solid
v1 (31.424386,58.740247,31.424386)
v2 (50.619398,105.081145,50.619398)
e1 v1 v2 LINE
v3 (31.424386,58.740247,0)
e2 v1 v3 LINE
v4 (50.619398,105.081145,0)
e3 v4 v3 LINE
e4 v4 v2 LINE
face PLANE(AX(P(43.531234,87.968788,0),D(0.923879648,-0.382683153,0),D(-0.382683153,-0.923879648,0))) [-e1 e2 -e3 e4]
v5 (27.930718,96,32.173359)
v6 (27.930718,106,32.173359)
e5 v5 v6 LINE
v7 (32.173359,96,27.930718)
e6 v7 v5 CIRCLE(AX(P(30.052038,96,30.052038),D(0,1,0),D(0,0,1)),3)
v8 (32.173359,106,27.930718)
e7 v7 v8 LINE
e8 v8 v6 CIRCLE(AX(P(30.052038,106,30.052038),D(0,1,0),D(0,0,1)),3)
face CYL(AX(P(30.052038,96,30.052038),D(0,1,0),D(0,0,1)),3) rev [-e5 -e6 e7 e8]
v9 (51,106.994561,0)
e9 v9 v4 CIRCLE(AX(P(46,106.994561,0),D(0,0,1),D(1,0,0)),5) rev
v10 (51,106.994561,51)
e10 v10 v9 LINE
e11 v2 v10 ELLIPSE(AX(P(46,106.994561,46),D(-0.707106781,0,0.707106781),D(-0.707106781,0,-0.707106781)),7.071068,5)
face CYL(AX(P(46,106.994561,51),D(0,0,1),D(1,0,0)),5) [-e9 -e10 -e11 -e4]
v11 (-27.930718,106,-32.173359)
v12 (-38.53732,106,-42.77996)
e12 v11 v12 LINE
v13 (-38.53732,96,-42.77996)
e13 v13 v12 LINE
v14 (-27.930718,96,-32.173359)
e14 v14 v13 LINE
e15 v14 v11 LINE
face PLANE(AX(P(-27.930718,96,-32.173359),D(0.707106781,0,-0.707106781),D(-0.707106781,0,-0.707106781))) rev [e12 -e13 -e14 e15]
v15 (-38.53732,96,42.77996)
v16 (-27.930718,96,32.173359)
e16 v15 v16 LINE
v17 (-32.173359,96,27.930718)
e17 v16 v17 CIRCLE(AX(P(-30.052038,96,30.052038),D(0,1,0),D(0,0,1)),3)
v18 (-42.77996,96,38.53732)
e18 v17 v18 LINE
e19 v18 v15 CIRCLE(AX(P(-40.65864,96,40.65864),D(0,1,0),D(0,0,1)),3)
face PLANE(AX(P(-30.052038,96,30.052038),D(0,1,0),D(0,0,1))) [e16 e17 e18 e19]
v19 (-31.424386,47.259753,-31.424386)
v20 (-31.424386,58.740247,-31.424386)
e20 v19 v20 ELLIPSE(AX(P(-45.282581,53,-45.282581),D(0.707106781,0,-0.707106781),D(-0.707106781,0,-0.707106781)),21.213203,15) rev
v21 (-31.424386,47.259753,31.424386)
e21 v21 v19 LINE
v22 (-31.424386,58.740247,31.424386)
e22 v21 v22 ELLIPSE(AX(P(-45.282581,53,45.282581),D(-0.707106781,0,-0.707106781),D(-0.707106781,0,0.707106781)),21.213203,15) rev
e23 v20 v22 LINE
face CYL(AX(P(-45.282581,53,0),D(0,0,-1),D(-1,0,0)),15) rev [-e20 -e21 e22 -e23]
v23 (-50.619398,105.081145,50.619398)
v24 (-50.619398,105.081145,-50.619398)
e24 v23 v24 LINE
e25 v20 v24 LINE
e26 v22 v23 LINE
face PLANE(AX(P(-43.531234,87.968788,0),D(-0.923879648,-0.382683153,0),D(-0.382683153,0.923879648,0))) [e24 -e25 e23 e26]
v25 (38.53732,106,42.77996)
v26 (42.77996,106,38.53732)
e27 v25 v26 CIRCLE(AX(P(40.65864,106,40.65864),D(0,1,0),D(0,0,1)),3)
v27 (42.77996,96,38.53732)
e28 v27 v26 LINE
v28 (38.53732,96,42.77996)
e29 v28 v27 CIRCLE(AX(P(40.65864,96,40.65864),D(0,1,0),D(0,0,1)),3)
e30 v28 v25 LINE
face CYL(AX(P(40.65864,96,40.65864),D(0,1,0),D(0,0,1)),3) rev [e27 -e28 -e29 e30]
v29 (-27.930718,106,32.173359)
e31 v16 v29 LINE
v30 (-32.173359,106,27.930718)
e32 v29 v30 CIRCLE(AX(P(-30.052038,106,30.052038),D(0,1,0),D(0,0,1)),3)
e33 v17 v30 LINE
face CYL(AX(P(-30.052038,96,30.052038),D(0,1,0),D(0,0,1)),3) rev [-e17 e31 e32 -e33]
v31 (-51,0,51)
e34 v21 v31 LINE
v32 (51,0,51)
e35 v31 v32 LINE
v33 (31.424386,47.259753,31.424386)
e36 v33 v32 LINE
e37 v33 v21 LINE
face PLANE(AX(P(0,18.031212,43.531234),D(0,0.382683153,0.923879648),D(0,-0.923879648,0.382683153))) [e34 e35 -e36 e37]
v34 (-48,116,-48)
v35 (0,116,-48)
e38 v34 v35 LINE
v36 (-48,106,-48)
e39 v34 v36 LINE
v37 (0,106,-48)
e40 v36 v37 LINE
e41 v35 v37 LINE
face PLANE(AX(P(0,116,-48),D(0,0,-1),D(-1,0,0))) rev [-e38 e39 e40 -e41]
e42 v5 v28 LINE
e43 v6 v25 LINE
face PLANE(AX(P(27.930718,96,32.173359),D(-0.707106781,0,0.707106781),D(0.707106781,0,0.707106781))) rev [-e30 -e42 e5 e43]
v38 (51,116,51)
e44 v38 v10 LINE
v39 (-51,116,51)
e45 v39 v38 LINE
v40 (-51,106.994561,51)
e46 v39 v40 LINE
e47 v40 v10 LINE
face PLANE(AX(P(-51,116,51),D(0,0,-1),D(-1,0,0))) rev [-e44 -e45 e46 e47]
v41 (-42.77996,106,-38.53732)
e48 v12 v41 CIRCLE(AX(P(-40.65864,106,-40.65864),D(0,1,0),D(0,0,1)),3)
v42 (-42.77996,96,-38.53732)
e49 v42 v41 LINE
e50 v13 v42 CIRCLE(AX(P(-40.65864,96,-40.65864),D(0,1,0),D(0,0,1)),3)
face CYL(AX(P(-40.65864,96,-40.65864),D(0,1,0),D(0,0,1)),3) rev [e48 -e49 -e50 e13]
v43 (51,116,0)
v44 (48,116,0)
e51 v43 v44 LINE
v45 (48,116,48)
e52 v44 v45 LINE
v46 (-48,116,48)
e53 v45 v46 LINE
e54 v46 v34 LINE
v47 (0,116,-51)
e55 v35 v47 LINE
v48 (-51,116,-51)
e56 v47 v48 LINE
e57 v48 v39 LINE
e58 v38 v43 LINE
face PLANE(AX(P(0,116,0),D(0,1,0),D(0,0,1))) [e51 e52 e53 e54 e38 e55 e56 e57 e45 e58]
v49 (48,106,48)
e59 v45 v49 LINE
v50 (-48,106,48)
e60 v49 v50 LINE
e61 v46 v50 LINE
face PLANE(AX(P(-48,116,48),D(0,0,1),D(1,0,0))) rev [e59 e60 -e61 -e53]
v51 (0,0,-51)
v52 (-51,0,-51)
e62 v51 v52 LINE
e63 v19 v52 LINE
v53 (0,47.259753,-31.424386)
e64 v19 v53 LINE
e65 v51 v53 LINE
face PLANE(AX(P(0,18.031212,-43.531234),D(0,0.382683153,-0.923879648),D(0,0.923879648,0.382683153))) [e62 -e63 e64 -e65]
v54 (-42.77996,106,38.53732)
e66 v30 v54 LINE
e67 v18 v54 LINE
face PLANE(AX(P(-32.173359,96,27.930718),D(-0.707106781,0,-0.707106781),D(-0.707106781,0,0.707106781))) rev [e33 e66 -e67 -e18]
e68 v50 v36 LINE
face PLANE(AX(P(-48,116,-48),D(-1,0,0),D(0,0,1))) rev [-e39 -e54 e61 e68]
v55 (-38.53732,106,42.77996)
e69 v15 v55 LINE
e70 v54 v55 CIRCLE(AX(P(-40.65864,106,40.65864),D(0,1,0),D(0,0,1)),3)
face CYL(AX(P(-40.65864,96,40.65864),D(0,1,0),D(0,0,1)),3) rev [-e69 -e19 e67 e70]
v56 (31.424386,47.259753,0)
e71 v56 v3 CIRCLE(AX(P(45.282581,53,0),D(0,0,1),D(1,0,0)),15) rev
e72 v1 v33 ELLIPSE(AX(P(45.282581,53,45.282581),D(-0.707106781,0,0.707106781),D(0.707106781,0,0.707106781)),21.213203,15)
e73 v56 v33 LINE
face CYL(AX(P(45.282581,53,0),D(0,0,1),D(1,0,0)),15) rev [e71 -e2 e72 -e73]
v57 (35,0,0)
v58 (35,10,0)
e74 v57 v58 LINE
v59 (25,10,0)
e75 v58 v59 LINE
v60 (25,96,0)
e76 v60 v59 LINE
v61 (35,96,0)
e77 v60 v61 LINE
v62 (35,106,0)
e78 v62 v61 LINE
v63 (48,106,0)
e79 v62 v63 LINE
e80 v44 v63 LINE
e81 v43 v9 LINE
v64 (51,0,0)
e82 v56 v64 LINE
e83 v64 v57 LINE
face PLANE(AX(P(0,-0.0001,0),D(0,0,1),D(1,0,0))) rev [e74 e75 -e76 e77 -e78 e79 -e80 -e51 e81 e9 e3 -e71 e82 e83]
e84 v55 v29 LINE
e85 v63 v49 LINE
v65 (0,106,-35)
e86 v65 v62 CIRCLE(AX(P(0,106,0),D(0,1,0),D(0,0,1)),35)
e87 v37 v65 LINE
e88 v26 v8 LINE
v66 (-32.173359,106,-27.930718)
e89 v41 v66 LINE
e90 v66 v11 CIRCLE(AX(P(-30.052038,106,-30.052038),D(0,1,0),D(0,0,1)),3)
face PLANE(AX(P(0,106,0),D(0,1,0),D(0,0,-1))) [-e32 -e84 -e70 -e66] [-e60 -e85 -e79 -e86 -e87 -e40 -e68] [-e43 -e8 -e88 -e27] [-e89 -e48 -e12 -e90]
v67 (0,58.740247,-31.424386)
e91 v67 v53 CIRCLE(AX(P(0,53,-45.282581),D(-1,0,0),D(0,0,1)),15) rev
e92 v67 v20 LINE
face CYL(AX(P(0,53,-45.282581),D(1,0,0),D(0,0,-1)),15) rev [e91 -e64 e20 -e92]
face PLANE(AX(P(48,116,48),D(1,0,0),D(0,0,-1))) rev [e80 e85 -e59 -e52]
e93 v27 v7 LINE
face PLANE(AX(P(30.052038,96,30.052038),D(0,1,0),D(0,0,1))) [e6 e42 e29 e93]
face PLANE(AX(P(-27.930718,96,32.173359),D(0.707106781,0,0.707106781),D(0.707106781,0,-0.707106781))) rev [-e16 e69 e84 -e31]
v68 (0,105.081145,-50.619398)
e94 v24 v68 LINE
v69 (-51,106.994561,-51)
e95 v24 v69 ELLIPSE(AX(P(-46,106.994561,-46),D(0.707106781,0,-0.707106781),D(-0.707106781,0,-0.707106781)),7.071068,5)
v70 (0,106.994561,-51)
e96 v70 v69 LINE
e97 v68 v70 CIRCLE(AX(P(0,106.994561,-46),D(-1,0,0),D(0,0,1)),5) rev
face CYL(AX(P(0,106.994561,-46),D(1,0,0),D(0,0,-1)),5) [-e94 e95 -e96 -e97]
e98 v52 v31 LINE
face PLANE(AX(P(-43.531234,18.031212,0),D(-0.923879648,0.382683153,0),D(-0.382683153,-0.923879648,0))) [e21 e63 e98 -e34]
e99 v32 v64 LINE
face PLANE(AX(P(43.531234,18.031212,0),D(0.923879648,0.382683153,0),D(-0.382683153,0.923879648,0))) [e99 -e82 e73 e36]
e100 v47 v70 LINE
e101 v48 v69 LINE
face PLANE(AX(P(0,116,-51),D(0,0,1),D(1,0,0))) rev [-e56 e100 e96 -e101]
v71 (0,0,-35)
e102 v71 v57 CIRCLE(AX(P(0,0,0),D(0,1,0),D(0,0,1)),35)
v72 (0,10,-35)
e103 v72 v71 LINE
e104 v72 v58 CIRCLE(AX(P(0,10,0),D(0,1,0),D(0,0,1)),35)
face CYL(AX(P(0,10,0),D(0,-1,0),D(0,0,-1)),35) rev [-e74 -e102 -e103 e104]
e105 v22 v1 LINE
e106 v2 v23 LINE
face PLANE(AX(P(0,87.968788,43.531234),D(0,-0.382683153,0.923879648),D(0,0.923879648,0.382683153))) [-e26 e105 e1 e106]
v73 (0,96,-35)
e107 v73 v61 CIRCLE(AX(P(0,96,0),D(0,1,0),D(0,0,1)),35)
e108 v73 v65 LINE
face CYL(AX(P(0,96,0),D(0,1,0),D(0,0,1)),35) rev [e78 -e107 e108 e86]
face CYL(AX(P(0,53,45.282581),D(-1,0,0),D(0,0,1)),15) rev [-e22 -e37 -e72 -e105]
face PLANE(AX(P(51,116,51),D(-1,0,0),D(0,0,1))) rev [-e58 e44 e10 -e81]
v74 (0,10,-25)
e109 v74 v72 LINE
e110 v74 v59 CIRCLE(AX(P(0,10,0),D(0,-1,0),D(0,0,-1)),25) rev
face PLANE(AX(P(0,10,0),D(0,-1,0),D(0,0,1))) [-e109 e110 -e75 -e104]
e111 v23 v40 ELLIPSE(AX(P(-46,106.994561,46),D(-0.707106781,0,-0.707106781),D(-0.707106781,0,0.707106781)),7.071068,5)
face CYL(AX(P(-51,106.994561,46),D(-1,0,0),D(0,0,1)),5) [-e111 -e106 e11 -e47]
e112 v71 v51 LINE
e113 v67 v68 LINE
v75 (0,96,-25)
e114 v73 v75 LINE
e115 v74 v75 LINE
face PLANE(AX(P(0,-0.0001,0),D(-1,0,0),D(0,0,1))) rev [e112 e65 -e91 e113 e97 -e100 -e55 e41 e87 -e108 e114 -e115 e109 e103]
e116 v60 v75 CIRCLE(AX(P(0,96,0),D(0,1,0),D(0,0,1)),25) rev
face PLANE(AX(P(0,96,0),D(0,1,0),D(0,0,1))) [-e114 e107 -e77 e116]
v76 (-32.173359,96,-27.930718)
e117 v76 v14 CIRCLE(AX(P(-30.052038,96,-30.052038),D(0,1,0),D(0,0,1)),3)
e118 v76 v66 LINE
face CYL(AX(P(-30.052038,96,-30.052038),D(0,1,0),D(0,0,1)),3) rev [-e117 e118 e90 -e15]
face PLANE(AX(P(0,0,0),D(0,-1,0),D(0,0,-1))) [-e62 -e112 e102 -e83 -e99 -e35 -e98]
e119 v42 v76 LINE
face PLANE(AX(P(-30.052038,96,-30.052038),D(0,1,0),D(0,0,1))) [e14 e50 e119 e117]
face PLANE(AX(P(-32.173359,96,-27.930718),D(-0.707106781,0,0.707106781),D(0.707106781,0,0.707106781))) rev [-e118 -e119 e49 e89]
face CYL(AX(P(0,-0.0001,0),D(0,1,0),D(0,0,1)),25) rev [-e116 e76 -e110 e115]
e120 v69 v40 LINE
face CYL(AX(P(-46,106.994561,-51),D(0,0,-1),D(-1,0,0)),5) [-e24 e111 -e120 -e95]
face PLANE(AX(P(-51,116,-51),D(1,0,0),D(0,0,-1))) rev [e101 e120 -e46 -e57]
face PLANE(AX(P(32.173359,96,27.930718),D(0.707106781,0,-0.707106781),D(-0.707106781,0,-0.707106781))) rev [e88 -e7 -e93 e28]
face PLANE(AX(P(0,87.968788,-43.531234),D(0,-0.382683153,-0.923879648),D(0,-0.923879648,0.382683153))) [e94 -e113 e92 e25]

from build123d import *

# Parameters (mm, degrees)
SKETCH3_R           = 25
CUT_EXTRUDE1_DEPTH  = 129.210764141
SKETCH4_R           = 35
CUT_EXTRUDE2_DEPTH  = 10
FILLET1_R           = 15
SKETCH5_W           = 51
SKETCH5_H           = 51
CUT_EXTRUDE3_DEPTH  = 129.210764141
BOSS_EXTRUDE1_DEPTH = 10
CUT_EXTRUDE4_DEPTH  = 10
FILLET2_R           = 5


with BuildPart() as part:
    # Sketch2 → Loft1 section 0
    with BuildSketch(Plane(origin=(0, 53, 0), x_dir=(1, 0, 0), z_dir=(0, 1, 0))):
        with BuildLine():
            Line((-29.0467, -29.0467), (29.0467, -29.0467))
            Line((29.0467, -29.0467), (29.0467, 29.0467))
            Line((29.0467, 29.0467), (-29.0467, 29.0467))
            Line((-29.0467, 29.0467), (-29.0467, -29.0467))
        make_face()
    # Sketch1 → Loft1 section 1
    with BuildSketch(Plane(origin=(0, 0, 0), x_dir=(1, 0, 0), z_dir=(0, 1, 0))):
        with BuildLine():
            Line((-51, -51), (51, -51))
            Line((51, -51), (51, 51))
            Line((51, 51), (-51, 51))
            Line((-51, 51), (-51, -51))
        make_face()
    loft1 = loft()

    # Mirror1: Loft1 across plane
    add(loft1.mirror(Plane.ZX.offset(53)))

    # Sketch3 → Cut-Extrude1 (cut, through all)
    with BuildSketch(Plane(origin=(0, 106, 0), x_dir=(1, 0, 0), z_dir=(0, 1, 0))):
        with Locations(Location((0, 0, 0), (0, 0, 270))):
            Circle(SKETCH3_R)
    extrude(amount=-CUT_EXTRUDE1_DEPTH, mode=Mode.SUBTRACT)

    # Sketch4 → Cut-Extrude2 (cut)
    with BuildSketch(Plane(origin=(0, 106, 0), x_dir=(1, 0, 0), z_dir=(0, 1, 0))):
        with Locations(Location((0, 0, 0), (0, 0, 270))):
            Circle(SKETCH4_R)
    cut_extrude2 = extrude(amount=-CUT_EXTRUDE2_DEPTH, mode=Mode.SUBTRACT)

    # Mirror2: Cut-Extrude2 across plane
    add(cut_extrude2.mirror(Plane.ZX.offset(53)), mode=Mode.SUBTRACT)

    # Fillet1
    # the kernel refuses this fillet: 15 mm, written as the material it adds along each edge
    with BuildSketch(Plane(origin=(44.579695283, 53, -29.0467), x_dir=(0, -0.923879648411862, -0.38268315255622926), z_dir=(-1, 0, 0))) as fillet1_piece_1_section:
        with BuildLine():
            CenterArc((FILLET1_R * 0.414213207547, -FILLET1_R), FILLET1_R, 90, 44.999965294)
            Line((-FILLET1_R * 0.292893145326, -FILLET1_R * 0.292892790501), (0, 0))
            Line((0, 0), (FILLET1_R * 0.414213207547, 0))
        make_face()
    fillet1_piece_1 = extrude(amount=89.159390566, mode=Mode.PRIVATE)
    fillet1_piece_1 = fillet1_piece_1 - Plane(origin=(-45.282580968, 53, -29.0467), x_dir=(0.9238796484118622, -0.3826831525562288, 0), z_dir=(0, 0, -1)) * Cylinder(15, 204, mode=Mode.PRIVATE)
    fillet1_piece_1 = fillet1_piece_1 - Plane(origin=(45.282580968, 53, -29.0467), x_dir=(-0.9238796484118622, -0.3826831525562288, 0), z_dir=(0, 0, 1)) * Cylinder(15, 204, mode=Mode.PRIVATE)
    add(fillet1_piece_1)
    with BuildSketch(Plane(origin=(-29.0467, 53, -44.579695283), x_dir=(-0.3826831525562283, -0.9238796484118624, 0), z_dir=(0, 0, 1))) as fillet1_piece_2_section:
        with BuildLine():
            CenterArc((FILLET1_R * 0.414213207547, -FILLET1_R), FILLET1_R, 90, 44.999965294)
            Line((-FILLET1_R * 0.292893145326, -FILLET1_R * 0.292892790501), (0, 0))
            Line((0, 0), (FILLET1_R * 0.414213207547, 0))
        make_face()
    fillet1_piece_2 = extrude(amount=89.159390566, mode=Mode.PRIVATE)
    fillet1_piece_2 = fillet1_piece_2 - Plane(origin=(-29.0467, 53, 45.282580968), x_dir=(0, -0.3826831525562288, -0.9238796484118622), z_dir=(-1, 0, 0)) * Cylinder(15, 204, mode=Mode.PRIVATE)
    fillet1_piece_2 = fillet1_piece_2 - Plane(origin=(-29.0467, 53, -45.282580968), x_dir=(0, -0.3826831525562288, 0.9238796484118622), z_dir=(1, 0, 0)) * Cylinder(15, 204, mode=Mode.PRIVATE)
    add(fillet1_piece_2)
    with BuildSketch(Plane(origin=(-44.579695283, 53, 29.0467), x_dir=(0, -0.923879648411862, 0.38268315255622926), z_dir=(1, 0, 0))) as fillet1_piece_3_section:
        with BuildLine():
            CenterArc((FILLET1_R * 0.414213207547, -FILLET1_R), FILLET1_R, 90, 44.999965294)
            Line((-FILLET1_R * 0.292893145326, -FILLET1_R * 0.292892790501), (0, 0))
            Line((0, 0), (FILLET1_R * 0.414213207547, 0))
        make_face()
    fillet1_piece_3 = extrude(amount=89.159390566, mode=Mode.PRIVATE)
    fillet1_piece_3 = fillet1_piece_3 - Plane(origin=(-45.282580968, 53, 29.0467), x_dir=(0.9238796484118622, -0.3826831525562288, 0), z_dir=(0, 0, -1)) * Cylinder(15, 204, mode=Mode.PRIVATE)
    fillet1_piece_3 = fillet1_piece_3 - Plane(origin=(45.282580968, 53, 29.0467), x_dir=(-0.9238796484118622, -0.3826831525562288, 0), z_dir=(0, 0, 1)) * Cylinder(15, 204, mode=Mode.PRIVATE)
    add(fillet1_piece_3)
    with BuildSketch(Plane(origin=(29.0467, 53, 44.579695283), x_dir=(0.3826831525562283, -0.9238796484118624, 0), z_dir=(0, 0, -1))) as fillet1_piece_4_section:
        with BuildLine():
            CenterArc((FILLET1_R * 0.414213207547, -FILLET1_R), FILLET1_R, 90, 44.999965294)
            Line((-FILLET1_R * 0.292893145326, -FILLET1_R * 0.292892790501), (0, 0))
            Line((0, 0), (FILLET1_R * 0.414213207547, 0))
        make_face()
    fillet1_piece_4 = extrude(amount=89.159390566, mode=Mode.PRIVATE)
    fillet1_piece_4 = fillet1_piece_4 - Plane(origin=(29.0467, 53, 45.282580968), x_dir=(0, -0.3826831525562288, -0.9238796484118622), z_dir=(-1, 0, 0)) * Cylinder(15, 204, mode=Mode.PRIVATE)
    fillet1_piece_4 = fillet1_piece_4 - Plane(origin=(29.0467, 53, -45.282580968), x_dir=(0, -0.3826831525562288, 0.9238796484118622), z_dir=(1, 0, 0)) * Cylinder(15, 204, mode=Mode.PRIVATE)
    add(fillet1_piece_4)

    # Sketch5 → Cut-Extrude3 (cut, through all)
    with BuildSketch(Plane(origin=(0, 106, 0), x_dir=(1, 0, 0), z_dir=(0, 1, 0))):
        with Locations((25.5, 25.5)):
            Rectangle(SKETCH5_W, SKETCH5_H)
    extrude(amount=-CUT_EXTRUDE3_DEPTH, mode=Mode.SUBTRACT)

    # Sketch6 → Boss-Extrude1 (add)
    with BuildSketch(Plane(origin=(0, 106, 0), x_dir=(1, 0, 0), z_dir=(0, 1, 0))):
        Polygon((0, 51), (-51, 51), (-51, -51), (51, -51), (51, 0), (48, 0), (48, -48), (-48, -48), (-48, 48), (0, 48), align=None)
    extrude(amount=BOSS_EXTRUDE1_DEPTH)

    # Sketch7 → Cut-Extrude4 (cut)
    with BuildSketch(Plane(origin=(0, 106, 0), x_dir=(1, 0, 0), z_dir=(0, 1, 0))):
        with BuildLine():
            Line((-32.173358544, 27.930717857), (-42.779960262, 38.537319575))
            ThreePointArc((-42.779960262, 38.537319575), (-42.779960262, 42.779960262), (-38.537319575, 42.779960262))
            Line((-38.537319575, 42.779960262), (-27.930717857, 32.173358544))
            ThreePointArc((-27.930717857, 32.173358544), (-27.930717857, 27.930717857), (-32.173358544, 27.930717857))
        make_face()
        with BuildLine():
            Line((27.930717857, 32.173358544), (38.537319575, 42.779960262))
            ThreePointArc((38.537319575, 42.779960262), (42.779960262, 42.779960262), (42.779960262, 38.537319575))
            Line((42.779960262, 38.537319575), (32.173358544, 27.930717857))
            ThreePointArc((32.173358544, 27.930717857), (27.930717857, 27.930717857), (27.930717857, 32.173358544))
        make_face()
        with BuildLine():
            Line((32.173358544, -27.930717857), (42.779960262, -38.537319575))
            ThreePointArc((42.779960262, -38.537319575), (42.779960262, -42.779960262), (38.537319575, -42.779960262))
            Line((38.537319575, -42.779960262), (27.930717857, -32.173358544))
            ThreePointArc((27.930717857, -32.173358544), (27.930717857, -27.930717857), (32.173358544, -27.930717857))
        make_face()
        with BuildLine():
            Line((-27.930717857, -32.173358544), (-38.537319575, -42.779960262))
            ThreePointArc((-38.537319575, -42.779960262), (-42.779960262, -42.779960262), (-42.779960262, -38.537319575))
            Line((-42.779960262, -38.537319575), (-32.173358544, -27.930717857))
            ThreePointArc((-32.173358544, -27.930717857), (-27.930717857, -27.930717857), (-27.930717857, -32.173358544))
        make_face()
    extrude(amount=-CUT_EXTRUDE4_DEPTH, mode=Mode.SUBTRACT)

    # Fillet2
    fillet2_edges = [part.edges().sort_by_distance(p)[0] for p in [
        (-25.5, 106, -51),
        (-51, 106, 0),
        (51, 106, 25.5),
        (0, 106, 51),
    ]]
    fillet(fillet2_edges, radius=FILLET2_R)


solid = part.part
